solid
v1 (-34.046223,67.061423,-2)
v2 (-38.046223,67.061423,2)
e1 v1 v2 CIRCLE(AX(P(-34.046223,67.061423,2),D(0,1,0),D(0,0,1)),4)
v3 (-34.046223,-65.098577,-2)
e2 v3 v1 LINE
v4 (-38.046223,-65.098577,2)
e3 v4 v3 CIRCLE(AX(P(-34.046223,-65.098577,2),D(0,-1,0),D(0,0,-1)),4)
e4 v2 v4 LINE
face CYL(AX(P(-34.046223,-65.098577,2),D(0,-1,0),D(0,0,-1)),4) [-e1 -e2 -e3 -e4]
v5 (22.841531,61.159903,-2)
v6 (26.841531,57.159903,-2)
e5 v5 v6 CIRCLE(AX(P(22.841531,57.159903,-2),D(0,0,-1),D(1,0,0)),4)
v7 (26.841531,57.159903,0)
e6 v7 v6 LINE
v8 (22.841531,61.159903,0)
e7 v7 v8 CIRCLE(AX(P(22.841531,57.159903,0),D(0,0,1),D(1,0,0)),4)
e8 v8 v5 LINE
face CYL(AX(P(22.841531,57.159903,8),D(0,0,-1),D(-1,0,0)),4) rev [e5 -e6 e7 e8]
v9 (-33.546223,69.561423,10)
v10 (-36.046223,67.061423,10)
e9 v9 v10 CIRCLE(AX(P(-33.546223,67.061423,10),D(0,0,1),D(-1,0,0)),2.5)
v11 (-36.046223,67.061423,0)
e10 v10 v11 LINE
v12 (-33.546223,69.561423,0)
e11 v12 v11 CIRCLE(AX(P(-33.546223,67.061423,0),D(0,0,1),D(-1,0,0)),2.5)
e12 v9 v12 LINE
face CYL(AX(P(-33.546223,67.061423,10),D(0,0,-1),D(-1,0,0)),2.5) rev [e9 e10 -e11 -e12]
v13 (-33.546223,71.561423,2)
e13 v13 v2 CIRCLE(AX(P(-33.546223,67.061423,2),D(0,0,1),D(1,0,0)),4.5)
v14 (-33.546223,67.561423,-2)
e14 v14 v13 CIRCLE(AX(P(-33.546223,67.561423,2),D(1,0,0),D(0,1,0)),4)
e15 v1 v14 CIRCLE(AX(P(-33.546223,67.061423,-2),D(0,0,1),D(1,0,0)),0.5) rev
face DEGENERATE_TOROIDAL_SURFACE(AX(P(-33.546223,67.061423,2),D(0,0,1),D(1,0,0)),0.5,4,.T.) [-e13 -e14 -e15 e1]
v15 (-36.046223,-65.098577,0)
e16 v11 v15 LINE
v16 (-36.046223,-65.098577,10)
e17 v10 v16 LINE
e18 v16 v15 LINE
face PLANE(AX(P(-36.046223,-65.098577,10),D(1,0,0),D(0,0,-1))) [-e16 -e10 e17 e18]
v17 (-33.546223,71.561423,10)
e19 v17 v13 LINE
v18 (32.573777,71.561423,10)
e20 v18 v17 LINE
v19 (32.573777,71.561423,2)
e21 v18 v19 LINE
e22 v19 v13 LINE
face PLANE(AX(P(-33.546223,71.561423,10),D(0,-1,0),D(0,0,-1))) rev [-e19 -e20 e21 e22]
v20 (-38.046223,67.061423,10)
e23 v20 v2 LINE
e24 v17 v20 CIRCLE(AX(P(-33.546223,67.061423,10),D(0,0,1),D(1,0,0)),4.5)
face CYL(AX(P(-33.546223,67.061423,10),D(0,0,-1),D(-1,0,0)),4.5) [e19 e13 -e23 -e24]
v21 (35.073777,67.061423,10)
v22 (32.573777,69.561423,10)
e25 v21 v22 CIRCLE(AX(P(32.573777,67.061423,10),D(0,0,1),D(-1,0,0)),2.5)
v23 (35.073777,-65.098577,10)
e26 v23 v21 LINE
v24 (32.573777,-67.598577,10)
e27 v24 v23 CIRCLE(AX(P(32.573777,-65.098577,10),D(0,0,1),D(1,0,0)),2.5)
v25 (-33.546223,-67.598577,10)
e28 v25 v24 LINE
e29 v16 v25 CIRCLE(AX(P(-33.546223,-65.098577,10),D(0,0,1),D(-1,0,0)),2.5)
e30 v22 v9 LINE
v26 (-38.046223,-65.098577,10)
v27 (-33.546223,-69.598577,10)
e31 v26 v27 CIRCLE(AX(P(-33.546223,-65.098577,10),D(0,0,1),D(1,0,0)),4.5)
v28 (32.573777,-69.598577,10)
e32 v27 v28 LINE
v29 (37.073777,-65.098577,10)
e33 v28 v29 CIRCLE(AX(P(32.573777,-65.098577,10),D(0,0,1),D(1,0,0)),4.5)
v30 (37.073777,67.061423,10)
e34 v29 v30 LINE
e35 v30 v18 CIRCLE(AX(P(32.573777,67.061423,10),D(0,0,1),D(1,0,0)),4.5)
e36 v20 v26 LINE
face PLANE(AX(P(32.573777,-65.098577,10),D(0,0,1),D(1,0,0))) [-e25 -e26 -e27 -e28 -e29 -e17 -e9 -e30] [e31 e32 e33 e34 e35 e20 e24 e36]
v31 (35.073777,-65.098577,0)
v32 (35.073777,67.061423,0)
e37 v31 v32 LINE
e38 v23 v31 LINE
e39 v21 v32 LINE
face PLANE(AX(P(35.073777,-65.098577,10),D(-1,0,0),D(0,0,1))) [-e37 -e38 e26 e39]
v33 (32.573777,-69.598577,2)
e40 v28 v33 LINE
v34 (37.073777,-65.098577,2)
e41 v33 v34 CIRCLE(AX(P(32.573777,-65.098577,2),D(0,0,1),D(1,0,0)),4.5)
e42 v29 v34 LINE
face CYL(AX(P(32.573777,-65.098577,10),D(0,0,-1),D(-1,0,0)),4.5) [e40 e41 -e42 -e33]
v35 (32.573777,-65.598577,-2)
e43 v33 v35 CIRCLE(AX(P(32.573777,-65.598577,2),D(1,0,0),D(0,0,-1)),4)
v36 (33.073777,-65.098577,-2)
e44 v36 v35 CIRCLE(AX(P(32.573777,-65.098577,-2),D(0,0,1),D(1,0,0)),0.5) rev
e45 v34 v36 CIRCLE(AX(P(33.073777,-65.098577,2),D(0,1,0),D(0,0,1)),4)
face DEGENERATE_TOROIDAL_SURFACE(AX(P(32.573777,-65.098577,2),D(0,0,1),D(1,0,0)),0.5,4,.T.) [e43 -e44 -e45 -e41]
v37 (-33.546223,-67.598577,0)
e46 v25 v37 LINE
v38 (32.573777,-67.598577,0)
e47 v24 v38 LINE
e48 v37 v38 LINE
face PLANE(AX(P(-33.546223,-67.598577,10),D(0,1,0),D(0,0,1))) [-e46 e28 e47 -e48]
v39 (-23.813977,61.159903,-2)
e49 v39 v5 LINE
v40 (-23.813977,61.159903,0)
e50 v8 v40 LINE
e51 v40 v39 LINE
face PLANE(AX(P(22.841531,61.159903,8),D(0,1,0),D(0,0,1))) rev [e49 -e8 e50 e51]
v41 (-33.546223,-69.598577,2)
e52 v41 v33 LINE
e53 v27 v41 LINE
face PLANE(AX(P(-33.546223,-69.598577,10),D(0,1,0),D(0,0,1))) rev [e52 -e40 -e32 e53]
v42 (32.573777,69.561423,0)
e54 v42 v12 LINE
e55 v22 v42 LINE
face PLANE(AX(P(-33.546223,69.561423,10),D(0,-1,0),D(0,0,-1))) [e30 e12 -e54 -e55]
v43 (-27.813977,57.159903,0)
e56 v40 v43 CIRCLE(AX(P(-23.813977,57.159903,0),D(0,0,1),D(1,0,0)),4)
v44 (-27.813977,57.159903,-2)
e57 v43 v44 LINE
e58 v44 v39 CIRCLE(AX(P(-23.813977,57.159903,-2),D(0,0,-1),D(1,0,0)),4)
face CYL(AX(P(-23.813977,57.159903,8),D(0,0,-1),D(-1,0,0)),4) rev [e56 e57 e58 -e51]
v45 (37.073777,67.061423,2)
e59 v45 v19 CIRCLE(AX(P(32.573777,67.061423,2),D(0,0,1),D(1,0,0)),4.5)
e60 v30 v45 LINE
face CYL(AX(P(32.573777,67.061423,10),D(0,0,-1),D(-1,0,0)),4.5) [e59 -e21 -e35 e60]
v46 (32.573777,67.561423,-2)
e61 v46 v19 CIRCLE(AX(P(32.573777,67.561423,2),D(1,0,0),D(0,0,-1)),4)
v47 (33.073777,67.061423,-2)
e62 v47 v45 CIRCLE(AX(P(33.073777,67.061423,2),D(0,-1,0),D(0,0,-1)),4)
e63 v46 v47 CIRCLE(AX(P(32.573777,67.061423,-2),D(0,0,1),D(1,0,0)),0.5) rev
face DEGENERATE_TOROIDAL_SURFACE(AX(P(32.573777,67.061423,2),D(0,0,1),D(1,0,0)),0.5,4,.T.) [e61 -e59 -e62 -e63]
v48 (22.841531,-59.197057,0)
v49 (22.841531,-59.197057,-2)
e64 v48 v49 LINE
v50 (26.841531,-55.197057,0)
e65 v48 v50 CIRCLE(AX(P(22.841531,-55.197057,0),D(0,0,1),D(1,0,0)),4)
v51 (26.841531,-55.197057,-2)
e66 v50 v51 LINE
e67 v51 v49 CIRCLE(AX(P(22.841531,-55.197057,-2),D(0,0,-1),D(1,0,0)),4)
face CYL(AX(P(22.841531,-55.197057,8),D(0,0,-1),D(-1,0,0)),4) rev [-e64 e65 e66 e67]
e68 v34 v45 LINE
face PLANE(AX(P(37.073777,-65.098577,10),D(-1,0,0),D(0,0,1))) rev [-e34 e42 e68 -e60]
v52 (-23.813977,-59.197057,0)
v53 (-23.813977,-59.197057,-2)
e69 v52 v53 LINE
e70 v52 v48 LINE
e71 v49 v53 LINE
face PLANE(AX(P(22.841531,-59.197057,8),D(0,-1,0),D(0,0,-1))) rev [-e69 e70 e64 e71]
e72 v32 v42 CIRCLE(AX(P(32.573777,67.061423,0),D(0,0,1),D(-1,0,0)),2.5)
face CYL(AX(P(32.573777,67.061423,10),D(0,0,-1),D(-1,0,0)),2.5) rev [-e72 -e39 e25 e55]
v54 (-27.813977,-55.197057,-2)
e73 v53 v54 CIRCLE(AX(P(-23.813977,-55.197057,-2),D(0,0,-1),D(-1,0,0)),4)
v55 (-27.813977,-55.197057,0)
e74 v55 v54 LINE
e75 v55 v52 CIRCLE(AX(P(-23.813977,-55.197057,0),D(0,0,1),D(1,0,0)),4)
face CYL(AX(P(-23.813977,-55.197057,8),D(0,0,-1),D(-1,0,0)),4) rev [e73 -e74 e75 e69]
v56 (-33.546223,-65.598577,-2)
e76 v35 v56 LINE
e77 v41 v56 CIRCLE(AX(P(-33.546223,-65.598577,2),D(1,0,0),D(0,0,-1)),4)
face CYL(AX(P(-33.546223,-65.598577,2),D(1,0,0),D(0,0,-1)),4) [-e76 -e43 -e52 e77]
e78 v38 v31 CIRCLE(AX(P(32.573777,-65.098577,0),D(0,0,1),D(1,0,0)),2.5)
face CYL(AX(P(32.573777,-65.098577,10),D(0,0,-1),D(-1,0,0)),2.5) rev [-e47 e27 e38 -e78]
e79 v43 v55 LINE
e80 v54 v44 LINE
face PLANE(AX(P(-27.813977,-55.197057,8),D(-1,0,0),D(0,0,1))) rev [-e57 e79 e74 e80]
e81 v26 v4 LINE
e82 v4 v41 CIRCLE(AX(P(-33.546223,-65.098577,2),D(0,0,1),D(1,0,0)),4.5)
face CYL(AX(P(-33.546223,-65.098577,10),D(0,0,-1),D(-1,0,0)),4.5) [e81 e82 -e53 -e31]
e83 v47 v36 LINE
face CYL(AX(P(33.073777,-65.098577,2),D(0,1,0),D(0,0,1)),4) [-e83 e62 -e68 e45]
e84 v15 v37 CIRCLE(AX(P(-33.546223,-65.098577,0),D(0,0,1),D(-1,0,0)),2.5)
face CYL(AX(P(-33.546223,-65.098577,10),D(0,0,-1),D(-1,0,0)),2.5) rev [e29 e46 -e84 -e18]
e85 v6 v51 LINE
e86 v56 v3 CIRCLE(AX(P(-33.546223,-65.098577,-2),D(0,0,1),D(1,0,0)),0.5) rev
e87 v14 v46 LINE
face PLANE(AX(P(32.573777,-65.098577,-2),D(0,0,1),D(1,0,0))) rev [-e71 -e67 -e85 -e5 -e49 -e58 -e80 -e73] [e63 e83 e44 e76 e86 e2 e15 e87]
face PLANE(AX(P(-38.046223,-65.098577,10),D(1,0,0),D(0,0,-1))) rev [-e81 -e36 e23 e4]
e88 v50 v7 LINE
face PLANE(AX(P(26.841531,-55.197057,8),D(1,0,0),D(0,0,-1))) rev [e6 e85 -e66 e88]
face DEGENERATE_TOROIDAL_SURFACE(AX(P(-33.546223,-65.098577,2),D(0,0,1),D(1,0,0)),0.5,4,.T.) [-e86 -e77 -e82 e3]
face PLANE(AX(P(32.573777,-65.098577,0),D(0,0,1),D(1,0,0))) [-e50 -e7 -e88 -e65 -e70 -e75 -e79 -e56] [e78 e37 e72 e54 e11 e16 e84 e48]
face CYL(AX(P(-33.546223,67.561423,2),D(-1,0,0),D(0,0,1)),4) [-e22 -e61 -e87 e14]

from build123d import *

# Parameters (mm, degrees)
BOSS_EXTRU_1_DEPTH      = 10
COQUE1_T                = 2
CONG_1_R                = 4
ENL_V_MAT_EXTRU_1_DEPTH = 10


with BuildPart() as part:
    # Esquisse1 → Boss.-Extru.1 (new body)
    with BuildSketch(Plane.XY):
        with BuildLine():
            Line((-33.546223224, -67.598576794), (32.573776776, -67.598576794))
            ThreePointArc((32.573776776, -67.598576794), (34.341543729, -66.866343747), (35.073776776, -65.098576794))
            Line((35.073776776, -65.098576794), (35.073776776, 67.061423206))
            ThreePointArc((35.073776776, 67.061423206), (34.341543729, 68.829190159), (32.573776776, 69.561423206))
            Line((32.573776776, 69.561423206), (-33.546223224, 69.561423206))
            ThreePointArc((-33.546223224, 69.561423206), (-35.313990177, 68.829190159), (-36.046223224, 67.061423206))
            Line((-36.046223224, 67.061423206), (-36.046223224, -65.098576794))
            ThreePointArc((-36.046223224, -65.098576794), (-35.313990177, -66.866343747), (-33.546223224, -67.598576794))
        make_face()
    extrude(amount=BOSS_EXTRU_1_DEPTH)

    # Coque1
    coque1_openings = [part.faces().sort_by_distance(p)[0] for p in [
        (-0.486223224, 0.981423206, 10),
    ]]
    offset(amount=COQUE1_T, openings=coque1_openings, kind=Kind.INTERSECTION)

    # Congé1
    # the kernel refuses this fillet: 4 mm, written as the material it takes off along each edge
    with BuildSketch(Plane(origin=(32.573776776, 71.561423206, -2), x_dir=(0, 0, 1), z_dir=(-1, 0, 0)), Plane(origin=(-33.546223224, -69.598576794, -2), x_dir=(0, 0, 1), z_dir=(1, 0, 0))) as cong_1_piece_1:
        with BuildLine():
            CenterArc((CONG_1_R, -CONG_1_R), CONG_1_R, 90, 90)
            Line((0, -CONG_1_R), (0, 0))
            Line((0, 0), (CONG_1_R, 0))
        make_face()
    extrude(amount=66.12, mode=Mode.SUBTRACT)
    with BuildSketch(Plane(origin=(32.573776776, 67.061423206, -2), x_dir=(0, 1, 0), z_dir=(-1, 0, 0))) as cong_1_piece_2:
        with BuildLine():
            CenterArc((4.5 - CONG_1_R, -CONG_1_R), CONG_1_R, 0, 90)
            Line((4.5 - CONG_1_R, 0), (4.5, 0))
            Line((4.5, 0), (4.5, -CONG_1_R))
        make_face()
    revolve(axis=Axis((32.573776776, 67.061423206, -2), (0, 0, -1)), revolution_arc=90, mode=Mode.SUBTRACT)
    with BuildSketch(Plane(origin=(37.073776776, -65.098576794, -2), x_dir=(0, 0, 1), z_dir=(0, 1, 0)), Plane(origin=(-38.046223224, 67.061423206, -2), x_dir=(0, 0, 1), z_dir=(0, -1, 0))) as cong_1_piece_3:
        with BuildLine():
            CenterArc((CONG_1_R, -CONG_1_R), CONG_1_R, 90, 90)
            Line((0, -CONG_1_R), (0, 0))
            Line((0, 0), (CONG_1_R, 0))
        make_face()
    extrude(amount=132.16, mode=Mode.SUBTRACT)
    with BuildSketch(Plane(origin=(32.573776776, -65.098576794, -2), x_dir=(1, 0, 0), z_dir=(0, 1, 0))) as cong_1_piece_4:
        with BuildLine():
            CenterArc((4.5 - CONG_1_R, -CONG_1_R), CONG_1_R, 0, 90)
            Line((4.5 - CONG_1_R, 0), (4.5, 0))
            Line((4.5, 0), (4.5, -CONG_1_R))
        make_face()
    revolve(axis=Axis((32.573776776, -65.098576794, -2), (0, 0, -1)), revolution_arc=90, mode=Mode.SUBTRACT)
    with BuildSketch(Plane(origin=(-33.546223224, -65.098576794, -2), x_dir=(0, -1, 0), z_dir=(1, 0, 0))) as cong_1_piece_5:
        with BuildLine():
            CenterArc((4.5 - CONG_1_R, -CONG_1_R), CONG_1_R, 0, 90)
            Line((4.5 - CONG_1_R, 0), (4.5, 0))
            Line((4.5, 0), (4.5, -CONG_1_R))
        make_face()
    revolve(axis=Axis((-33.546223224, -65.098576794, -2), (0, 0, -1)), revolution_arc=90, mode=Mode.SUBTRACT)
    with BuildSketch(Plane(origin=(-33.546223224, 67.061423206, -2), x_dir=(-1, 0, 0), z_dir=(0, -1, 0))) as cong_1_piece_6:
        with BuildLine():
            CenterArc((4.5 - CONG_1_R, -CONG_1_R), CONG_1_R, 0, 90)
            Line((4.5 - CONG_1_R, 0), (4.5, 0))
            Line((4.5, 0), (4.5, -CONG_1_R))
        make_face()
    revolve(axis=Axis((-33.546223224, 67.061423206, -2), (0, 0, -1)), revolution_arc=90, mode=Mode.SUBTRACT)

    # Esquisse2 → Enlèv. mat.-Extru.1 (cut)
    with BuildSketch(Plane(origin=(0, 0, -2), x_dir=(-1, 0, 0), z_dir=(0, 0, -1))):
        with BuildLine():
            Line((-22.841530632, -59.197056867), (23.81397708, -59.197056867))
            ThreePointArc((23.81397708, -59.197056867), (26.642404205, -58.025483992), (27.81397708, -55.197056867))
            Line((27.81397708, -55.197056867), (27.81397708, 57.159903279))
            ThreePointArc((27.81397708, 57.159903279), (26.642404205, 59.988330404), (23.81397708, 61.159903279))
            Line((23.81397708, 61.159903279), (-22.841530632, 61.159903279))
            ThreePointArc((-22.841530632, 61.159903279), (-25.669957756, 59.988330404), (-26.841530632, 57.159903279))
            Line((-26.841530632, 57.159903279), (-26.841530632, -55.197056867))
            ThreePointArc((-26.841530632, -55.197056867), (-25.669957756, -58.025483992), (-22.841530632, -59.197056867))
        make_face()
    extrude(amount=-ENL_V_MAT_EXTRU_1_DEPTH, mode=Mode.SUBTRACT)


solid = part.part
